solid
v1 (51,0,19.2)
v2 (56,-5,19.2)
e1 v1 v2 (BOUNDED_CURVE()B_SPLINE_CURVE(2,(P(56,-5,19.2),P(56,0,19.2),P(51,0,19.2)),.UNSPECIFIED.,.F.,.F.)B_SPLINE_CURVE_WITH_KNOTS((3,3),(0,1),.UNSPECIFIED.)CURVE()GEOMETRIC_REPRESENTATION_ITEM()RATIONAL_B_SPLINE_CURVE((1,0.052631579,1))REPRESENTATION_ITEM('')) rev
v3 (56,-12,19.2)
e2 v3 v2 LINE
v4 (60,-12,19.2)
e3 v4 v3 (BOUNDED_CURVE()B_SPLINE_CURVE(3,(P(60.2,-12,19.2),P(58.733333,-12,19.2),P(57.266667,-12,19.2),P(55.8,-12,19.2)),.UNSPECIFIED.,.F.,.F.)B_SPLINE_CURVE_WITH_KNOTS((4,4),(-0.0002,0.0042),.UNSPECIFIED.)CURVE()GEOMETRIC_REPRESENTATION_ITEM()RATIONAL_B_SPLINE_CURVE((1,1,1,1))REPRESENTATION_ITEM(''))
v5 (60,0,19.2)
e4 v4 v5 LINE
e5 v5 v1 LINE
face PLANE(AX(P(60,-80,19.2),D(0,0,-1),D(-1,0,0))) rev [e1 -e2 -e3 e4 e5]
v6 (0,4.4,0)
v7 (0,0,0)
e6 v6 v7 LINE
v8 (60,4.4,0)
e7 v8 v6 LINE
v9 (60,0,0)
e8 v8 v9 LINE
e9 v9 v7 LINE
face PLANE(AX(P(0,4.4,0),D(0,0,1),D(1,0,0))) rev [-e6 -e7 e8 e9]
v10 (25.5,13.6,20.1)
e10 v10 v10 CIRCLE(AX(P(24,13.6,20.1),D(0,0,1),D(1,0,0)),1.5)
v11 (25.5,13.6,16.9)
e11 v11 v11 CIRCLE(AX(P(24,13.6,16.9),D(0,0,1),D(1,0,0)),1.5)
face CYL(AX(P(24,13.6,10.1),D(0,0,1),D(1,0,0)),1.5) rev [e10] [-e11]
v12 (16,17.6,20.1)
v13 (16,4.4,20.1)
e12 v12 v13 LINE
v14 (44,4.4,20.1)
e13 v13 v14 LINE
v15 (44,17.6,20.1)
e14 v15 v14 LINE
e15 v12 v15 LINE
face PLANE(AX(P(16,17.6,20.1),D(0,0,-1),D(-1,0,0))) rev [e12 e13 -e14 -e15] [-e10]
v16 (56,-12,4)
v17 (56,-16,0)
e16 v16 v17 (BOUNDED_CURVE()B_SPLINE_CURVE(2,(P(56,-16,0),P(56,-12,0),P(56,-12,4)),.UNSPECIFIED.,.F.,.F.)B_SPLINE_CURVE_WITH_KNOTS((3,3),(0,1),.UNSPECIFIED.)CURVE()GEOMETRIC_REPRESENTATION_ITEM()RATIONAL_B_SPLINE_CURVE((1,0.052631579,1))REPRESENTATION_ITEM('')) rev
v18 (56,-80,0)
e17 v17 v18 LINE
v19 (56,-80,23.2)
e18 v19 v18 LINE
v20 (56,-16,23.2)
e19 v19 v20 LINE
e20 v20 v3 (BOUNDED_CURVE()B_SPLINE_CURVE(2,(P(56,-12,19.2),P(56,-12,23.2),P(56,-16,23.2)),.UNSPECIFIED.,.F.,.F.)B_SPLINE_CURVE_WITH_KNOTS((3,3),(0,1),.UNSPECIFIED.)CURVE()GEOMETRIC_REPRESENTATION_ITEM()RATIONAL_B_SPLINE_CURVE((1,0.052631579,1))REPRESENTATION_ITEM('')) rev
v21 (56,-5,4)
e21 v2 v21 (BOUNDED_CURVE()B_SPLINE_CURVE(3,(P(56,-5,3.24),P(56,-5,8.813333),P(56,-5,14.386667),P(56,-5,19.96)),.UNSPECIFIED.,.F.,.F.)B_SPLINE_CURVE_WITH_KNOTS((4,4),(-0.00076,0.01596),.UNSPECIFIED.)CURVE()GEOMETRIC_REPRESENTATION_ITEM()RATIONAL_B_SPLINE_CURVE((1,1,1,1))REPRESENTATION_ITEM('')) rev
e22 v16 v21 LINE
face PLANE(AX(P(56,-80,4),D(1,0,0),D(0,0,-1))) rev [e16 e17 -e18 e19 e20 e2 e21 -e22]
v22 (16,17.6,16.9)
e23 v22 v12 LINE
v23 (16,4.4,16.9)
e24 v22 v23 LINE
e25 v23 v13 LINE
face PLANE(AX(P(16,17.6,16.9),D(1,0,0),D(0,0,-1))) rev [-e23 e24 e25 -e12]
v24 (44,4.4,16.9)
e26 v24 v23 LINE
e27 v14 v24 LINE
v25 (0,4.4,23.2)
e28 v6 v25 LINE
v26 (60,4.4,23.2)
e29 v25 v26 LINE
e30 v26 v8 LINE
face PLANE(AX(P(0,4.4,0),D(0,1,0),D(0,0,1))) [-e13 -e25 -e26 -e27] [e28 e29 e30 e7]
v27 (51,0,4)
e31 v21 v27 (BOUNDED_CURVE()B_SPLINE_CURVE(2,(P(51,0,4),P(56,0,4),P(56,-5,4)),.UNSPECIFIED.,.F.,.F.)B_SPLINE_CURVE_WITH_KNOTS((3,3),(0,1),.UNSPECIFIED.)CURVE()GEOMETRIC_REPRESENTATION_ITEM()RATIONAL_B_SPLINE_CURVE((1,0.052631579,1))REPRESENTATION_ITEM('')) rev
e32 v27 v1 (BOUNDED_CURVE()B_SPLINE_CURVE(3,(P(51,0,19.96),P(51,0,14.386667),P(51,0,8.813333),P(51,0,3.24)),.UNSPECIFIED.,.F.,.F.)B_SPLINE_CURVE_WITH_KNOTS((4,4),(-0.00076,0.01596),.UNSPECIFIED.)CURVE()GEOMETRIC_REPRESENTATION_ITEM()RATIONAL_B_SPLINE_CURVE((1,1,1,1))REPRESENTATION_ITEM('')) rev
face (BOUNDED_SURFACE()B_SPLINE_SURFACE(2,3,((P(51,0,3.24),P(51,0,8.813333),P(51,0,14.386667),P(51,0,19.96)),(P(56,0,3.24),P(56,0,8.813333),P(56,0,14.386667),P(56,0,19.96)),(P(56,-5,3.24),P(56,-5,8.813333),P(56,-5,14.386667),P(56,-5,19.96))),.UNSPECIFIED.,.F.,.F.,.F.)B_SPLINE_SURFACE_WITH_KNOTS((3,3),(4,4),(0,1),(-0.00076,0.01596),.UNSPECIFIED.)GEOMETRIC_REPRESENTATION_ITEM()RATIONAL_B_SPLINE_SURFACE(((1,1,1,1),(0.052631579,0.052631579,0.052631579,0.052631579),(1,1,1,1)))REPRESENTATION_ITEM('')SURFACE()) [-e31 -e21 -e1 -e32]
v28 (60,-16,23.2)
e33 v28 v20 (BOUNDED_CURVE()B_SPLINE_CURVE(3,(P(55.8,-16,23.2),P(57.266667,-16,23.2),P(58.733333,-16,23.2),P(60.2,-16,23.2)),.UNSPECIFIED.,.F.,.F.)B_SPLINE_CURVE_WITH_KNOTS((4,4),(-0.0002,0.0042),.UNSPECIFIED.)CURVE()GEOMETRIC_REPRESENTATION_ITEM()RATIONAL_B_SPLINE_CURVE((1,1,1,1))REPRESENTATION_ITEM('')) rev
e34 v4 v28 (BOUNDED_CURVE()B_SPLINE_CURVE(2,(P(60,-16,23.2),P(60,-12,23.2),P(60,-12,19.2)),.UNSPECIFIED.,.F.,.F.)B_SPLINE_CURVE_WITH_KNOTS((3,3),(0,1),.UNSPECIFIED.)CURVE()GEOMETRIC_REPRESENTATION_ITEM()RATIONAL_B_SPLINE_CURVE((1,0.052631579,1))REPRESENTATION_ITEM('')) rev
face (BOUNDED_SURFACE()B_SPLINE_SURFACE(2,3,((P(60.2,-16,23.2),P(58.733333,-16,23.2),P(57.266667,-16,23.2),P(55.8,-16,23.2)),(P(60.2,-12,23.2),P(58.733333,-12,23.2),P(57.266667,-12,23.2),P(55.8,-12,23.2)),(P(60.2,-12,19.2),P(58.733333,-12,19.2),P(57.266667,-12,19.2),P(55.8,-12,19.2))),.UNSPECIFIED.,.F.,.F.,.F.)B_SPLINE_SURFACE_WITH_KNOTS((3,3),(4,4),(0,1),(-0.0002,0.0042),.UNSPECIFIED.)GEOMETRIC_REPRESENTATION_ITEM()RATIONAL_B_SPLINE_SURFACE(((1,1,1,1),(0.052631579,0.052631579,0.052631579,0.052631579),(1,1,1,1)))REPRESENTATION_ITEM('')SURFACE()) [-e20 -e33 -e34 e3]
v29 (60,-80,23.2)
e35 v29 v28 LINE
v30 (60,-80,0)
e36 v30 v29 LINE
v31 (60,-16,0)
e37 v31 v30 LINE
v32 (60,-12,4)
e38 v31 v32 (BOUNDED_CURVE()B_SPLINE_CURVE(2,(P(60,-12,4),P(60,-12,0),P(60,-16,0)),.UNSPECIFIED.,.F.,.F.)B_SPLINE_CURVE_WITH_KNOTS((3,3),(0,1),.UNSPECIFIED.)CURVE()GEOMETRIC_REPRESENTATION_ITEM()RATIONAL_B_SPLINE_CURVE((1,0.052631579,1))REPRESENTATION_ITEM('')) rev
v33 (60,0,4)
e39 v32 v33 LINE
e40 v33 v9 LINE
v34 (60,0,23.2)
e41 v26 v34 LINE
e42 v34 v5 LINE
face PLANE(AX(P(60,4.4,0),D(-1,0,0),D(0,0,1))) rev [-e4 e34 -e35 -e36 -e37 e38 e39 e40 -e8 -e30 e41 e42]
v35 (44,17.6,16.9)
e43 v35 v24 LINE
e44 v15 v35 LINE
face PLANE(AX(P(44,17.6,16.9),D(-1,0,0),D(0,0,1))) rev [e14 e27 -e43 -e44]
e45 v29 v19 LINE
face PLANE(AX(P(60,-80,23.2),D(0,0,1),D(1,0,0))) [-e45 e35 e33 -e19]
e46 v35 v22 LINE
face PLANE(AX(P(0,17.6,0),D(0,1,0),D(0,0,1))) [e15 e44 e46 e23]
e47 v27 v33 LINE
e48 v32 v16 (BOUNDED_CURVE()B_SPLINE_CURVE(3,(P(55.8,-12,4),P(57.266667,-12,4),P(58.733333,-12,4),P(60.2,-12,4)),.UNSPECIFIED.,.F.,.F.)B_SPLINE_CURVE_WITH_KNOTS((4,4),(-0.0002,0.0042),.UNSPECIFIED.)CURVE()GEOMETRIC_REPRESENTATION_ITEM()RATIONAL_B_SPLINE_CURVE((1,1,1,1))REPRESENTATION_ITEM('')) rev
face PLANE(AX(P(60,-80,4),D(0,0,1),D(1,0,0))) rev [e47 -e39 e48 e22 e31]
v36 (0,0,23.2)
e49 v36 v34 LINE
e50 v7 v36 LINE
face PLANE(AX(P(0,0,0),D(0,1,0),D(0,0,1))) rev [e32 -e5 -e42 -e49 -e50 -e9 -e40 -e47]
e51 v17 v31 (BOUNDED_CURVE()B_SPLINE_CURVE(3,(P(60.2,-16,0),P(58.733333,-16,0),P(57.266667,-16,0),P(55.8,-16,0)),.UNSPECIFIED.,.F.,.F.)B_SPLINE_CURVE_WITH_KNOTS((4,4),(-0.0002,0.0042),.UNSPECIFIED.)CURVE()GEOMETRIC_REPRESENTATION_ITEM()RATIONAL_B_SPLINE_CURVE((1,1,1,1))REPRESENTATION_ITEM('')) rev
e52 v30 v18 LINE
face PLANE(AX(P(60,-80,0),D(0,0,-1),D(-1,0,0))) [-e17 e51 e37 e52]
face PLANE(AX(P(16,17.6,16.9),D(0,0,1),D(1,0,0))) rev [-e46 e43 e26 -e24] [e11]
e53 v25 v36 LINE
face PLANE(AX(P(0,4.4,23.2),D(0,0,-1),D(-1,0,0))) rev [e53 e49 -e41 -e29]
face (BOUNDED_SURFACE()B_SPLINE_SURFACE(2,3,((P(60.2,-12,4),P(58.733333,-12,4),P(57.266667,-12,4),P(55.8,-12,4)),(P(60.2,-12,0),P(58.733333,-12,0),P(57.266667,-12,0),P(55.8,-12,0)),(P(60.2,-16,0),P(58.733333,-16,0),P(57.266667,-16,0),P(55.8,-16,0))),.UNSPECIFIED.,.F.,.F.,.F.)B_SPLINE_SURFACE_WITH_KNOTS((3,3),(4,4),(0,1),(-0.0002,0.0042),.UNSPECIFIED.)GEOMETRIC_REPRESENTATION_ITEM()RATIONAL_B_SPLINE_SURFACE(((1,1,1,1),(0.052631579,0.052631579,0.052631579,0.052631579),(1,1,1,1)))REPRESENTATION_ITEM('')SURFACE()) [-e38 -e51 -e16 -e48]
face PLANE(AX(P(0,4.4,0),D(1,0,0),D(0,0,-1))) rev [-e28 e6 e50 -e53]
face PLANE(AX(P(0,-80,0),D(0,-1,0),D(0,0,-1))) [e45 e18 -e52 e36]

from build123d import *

# Parameters (mm, degrees)
SKETCH1_W           = 60
SKETCH1_H           = 23.2
BOSS_EXTRUDE1_DEPTH = 4.4
SKETCH2_W           = 28
SKETCH2_H           = 3.2
BOSS_EXTRUDE2_DEPTH = 13.2
SKETCH3_W           = 4
SKETCH3_H           = 15.2
BOSS_EXTRUDE3_DEPTH = 80
SKETCH4_W           = 4
SKETCH4_H           = 68
BOSS_EXTRUDE4_DEPTH = 4
FILLET1_SIZE        = 5
FILLET2_SIZE        = 4
SKETCH5_R           = 1.5
CUT_EXTRUDE1_DEPTH  = 10


with BuildPart() as part:
    # Sketch1 → Boss-Extrude1 (new body)
    with BuildSketch(Plane(origin=(0, 0, 0), x_dir=(1, 0, 0), z_dir=(0, 1, 0))):
        with Locations((30, -11.6)):
            Rectangle(SKETCH1_W, SKETCH1_H)
    extrude(amount=BOSS_EXTRUDE1_DEPTH)

    # Sketch2 → Boss-Extrude2 (add)
    with BuildSketch(Plane(origin=(0, 4.4, 0), x_dir=(1, 0, 0), z_dir=(0, 1, 0))):
        with Locations((30, -18.5)):
            Rectangle(SKETCH2_W, SKETCH2_H)
    extrude(amount=BOSS_EXTRUDE2_DEPTH)

    # Sketch3 → Boss-Extrude3 (add)
    with BuildSketch(Plane(origin=(0, 0, 0), x_dir=(-1, 0, 0), z_dir=(0, -1, 0))):
        with Locations((-58, -11.6)):
            Rectangle(SKETCH3_W, SKETCH3_H)
    extrude(amount=BOSS_EXTRUDE3_DEPTH)

    # Sketch4 → Boss-Extrude4 (add)
    with BuildSketch(Plane.ZY.offset(-56)):
        with Locations((21.2, -46)):
            Rectangle(SKETCH4_W, SKETCH4_H)
        with Locations((2, -46)):
            Rectangle(SKETCH4_W, SKETCH4_H)
    extrude(amount=-BOSS_EXTRUDE4_DEPTH)

    # Fillet1
    # a fillet whose section is not a circle: 5 mm, written as the material it adds along each edge
    with BuildSketch(Plane(origin=(56, 0, 4), x_dir=(-1, 0, 0), z_dir=(0, 0, 1))) as fillet1_piece_1:
        with BuildLine():
            Bezier((FILLET1_SIZE, 0), (0, 0), (0, FILLET1_SIZE), weights=[1, 0.052631579, 1])
            Line((0, FILLET1_SIZE), (0, 0))
            Line((0, 0), (FILLET1_SIZE, 0))
        make_face()
    extrude(amount=15.2)

    # Fillet2
    # a fillet whose section is not a circle: 4 mm, written as the material it takes off along each edge
    with BuildSketch(Plane(origin=(46, -12, 0), x_dir=(0, 0, 1), z_dir=(1, 0, 0)), Plane(origin=(46, -12, 23.2), x_dir=(0, -1, 0), z_dir=(1, 0, 0))) as fillet2_piece_1:
        with BuildLine():
            Bezier((FILLET2_SIZE, 0), (0, 0), (0, FILLET2_SIZE), weights=[1, 0.052631579, 1])
            Line((0, FILLET2_SIZE), (0, 0))
            Line((0, 0), (FILLET2_SIZE, 0))
        make_face()
    extrude(amount=24, mode=Mode.SUBTRACT)

    # Sketch5 → Cut-Extrude1 (cut)
    with BuildSketch(Plane.XY.offset(20.1)):
        with Locations((24, 13.6)):
            Circle(SKETCH5_R)
    extrude(amount=-CUT_EXTRUDE1_DEPTH, mode=Mode.SUBTRACT)


solid = part.part
